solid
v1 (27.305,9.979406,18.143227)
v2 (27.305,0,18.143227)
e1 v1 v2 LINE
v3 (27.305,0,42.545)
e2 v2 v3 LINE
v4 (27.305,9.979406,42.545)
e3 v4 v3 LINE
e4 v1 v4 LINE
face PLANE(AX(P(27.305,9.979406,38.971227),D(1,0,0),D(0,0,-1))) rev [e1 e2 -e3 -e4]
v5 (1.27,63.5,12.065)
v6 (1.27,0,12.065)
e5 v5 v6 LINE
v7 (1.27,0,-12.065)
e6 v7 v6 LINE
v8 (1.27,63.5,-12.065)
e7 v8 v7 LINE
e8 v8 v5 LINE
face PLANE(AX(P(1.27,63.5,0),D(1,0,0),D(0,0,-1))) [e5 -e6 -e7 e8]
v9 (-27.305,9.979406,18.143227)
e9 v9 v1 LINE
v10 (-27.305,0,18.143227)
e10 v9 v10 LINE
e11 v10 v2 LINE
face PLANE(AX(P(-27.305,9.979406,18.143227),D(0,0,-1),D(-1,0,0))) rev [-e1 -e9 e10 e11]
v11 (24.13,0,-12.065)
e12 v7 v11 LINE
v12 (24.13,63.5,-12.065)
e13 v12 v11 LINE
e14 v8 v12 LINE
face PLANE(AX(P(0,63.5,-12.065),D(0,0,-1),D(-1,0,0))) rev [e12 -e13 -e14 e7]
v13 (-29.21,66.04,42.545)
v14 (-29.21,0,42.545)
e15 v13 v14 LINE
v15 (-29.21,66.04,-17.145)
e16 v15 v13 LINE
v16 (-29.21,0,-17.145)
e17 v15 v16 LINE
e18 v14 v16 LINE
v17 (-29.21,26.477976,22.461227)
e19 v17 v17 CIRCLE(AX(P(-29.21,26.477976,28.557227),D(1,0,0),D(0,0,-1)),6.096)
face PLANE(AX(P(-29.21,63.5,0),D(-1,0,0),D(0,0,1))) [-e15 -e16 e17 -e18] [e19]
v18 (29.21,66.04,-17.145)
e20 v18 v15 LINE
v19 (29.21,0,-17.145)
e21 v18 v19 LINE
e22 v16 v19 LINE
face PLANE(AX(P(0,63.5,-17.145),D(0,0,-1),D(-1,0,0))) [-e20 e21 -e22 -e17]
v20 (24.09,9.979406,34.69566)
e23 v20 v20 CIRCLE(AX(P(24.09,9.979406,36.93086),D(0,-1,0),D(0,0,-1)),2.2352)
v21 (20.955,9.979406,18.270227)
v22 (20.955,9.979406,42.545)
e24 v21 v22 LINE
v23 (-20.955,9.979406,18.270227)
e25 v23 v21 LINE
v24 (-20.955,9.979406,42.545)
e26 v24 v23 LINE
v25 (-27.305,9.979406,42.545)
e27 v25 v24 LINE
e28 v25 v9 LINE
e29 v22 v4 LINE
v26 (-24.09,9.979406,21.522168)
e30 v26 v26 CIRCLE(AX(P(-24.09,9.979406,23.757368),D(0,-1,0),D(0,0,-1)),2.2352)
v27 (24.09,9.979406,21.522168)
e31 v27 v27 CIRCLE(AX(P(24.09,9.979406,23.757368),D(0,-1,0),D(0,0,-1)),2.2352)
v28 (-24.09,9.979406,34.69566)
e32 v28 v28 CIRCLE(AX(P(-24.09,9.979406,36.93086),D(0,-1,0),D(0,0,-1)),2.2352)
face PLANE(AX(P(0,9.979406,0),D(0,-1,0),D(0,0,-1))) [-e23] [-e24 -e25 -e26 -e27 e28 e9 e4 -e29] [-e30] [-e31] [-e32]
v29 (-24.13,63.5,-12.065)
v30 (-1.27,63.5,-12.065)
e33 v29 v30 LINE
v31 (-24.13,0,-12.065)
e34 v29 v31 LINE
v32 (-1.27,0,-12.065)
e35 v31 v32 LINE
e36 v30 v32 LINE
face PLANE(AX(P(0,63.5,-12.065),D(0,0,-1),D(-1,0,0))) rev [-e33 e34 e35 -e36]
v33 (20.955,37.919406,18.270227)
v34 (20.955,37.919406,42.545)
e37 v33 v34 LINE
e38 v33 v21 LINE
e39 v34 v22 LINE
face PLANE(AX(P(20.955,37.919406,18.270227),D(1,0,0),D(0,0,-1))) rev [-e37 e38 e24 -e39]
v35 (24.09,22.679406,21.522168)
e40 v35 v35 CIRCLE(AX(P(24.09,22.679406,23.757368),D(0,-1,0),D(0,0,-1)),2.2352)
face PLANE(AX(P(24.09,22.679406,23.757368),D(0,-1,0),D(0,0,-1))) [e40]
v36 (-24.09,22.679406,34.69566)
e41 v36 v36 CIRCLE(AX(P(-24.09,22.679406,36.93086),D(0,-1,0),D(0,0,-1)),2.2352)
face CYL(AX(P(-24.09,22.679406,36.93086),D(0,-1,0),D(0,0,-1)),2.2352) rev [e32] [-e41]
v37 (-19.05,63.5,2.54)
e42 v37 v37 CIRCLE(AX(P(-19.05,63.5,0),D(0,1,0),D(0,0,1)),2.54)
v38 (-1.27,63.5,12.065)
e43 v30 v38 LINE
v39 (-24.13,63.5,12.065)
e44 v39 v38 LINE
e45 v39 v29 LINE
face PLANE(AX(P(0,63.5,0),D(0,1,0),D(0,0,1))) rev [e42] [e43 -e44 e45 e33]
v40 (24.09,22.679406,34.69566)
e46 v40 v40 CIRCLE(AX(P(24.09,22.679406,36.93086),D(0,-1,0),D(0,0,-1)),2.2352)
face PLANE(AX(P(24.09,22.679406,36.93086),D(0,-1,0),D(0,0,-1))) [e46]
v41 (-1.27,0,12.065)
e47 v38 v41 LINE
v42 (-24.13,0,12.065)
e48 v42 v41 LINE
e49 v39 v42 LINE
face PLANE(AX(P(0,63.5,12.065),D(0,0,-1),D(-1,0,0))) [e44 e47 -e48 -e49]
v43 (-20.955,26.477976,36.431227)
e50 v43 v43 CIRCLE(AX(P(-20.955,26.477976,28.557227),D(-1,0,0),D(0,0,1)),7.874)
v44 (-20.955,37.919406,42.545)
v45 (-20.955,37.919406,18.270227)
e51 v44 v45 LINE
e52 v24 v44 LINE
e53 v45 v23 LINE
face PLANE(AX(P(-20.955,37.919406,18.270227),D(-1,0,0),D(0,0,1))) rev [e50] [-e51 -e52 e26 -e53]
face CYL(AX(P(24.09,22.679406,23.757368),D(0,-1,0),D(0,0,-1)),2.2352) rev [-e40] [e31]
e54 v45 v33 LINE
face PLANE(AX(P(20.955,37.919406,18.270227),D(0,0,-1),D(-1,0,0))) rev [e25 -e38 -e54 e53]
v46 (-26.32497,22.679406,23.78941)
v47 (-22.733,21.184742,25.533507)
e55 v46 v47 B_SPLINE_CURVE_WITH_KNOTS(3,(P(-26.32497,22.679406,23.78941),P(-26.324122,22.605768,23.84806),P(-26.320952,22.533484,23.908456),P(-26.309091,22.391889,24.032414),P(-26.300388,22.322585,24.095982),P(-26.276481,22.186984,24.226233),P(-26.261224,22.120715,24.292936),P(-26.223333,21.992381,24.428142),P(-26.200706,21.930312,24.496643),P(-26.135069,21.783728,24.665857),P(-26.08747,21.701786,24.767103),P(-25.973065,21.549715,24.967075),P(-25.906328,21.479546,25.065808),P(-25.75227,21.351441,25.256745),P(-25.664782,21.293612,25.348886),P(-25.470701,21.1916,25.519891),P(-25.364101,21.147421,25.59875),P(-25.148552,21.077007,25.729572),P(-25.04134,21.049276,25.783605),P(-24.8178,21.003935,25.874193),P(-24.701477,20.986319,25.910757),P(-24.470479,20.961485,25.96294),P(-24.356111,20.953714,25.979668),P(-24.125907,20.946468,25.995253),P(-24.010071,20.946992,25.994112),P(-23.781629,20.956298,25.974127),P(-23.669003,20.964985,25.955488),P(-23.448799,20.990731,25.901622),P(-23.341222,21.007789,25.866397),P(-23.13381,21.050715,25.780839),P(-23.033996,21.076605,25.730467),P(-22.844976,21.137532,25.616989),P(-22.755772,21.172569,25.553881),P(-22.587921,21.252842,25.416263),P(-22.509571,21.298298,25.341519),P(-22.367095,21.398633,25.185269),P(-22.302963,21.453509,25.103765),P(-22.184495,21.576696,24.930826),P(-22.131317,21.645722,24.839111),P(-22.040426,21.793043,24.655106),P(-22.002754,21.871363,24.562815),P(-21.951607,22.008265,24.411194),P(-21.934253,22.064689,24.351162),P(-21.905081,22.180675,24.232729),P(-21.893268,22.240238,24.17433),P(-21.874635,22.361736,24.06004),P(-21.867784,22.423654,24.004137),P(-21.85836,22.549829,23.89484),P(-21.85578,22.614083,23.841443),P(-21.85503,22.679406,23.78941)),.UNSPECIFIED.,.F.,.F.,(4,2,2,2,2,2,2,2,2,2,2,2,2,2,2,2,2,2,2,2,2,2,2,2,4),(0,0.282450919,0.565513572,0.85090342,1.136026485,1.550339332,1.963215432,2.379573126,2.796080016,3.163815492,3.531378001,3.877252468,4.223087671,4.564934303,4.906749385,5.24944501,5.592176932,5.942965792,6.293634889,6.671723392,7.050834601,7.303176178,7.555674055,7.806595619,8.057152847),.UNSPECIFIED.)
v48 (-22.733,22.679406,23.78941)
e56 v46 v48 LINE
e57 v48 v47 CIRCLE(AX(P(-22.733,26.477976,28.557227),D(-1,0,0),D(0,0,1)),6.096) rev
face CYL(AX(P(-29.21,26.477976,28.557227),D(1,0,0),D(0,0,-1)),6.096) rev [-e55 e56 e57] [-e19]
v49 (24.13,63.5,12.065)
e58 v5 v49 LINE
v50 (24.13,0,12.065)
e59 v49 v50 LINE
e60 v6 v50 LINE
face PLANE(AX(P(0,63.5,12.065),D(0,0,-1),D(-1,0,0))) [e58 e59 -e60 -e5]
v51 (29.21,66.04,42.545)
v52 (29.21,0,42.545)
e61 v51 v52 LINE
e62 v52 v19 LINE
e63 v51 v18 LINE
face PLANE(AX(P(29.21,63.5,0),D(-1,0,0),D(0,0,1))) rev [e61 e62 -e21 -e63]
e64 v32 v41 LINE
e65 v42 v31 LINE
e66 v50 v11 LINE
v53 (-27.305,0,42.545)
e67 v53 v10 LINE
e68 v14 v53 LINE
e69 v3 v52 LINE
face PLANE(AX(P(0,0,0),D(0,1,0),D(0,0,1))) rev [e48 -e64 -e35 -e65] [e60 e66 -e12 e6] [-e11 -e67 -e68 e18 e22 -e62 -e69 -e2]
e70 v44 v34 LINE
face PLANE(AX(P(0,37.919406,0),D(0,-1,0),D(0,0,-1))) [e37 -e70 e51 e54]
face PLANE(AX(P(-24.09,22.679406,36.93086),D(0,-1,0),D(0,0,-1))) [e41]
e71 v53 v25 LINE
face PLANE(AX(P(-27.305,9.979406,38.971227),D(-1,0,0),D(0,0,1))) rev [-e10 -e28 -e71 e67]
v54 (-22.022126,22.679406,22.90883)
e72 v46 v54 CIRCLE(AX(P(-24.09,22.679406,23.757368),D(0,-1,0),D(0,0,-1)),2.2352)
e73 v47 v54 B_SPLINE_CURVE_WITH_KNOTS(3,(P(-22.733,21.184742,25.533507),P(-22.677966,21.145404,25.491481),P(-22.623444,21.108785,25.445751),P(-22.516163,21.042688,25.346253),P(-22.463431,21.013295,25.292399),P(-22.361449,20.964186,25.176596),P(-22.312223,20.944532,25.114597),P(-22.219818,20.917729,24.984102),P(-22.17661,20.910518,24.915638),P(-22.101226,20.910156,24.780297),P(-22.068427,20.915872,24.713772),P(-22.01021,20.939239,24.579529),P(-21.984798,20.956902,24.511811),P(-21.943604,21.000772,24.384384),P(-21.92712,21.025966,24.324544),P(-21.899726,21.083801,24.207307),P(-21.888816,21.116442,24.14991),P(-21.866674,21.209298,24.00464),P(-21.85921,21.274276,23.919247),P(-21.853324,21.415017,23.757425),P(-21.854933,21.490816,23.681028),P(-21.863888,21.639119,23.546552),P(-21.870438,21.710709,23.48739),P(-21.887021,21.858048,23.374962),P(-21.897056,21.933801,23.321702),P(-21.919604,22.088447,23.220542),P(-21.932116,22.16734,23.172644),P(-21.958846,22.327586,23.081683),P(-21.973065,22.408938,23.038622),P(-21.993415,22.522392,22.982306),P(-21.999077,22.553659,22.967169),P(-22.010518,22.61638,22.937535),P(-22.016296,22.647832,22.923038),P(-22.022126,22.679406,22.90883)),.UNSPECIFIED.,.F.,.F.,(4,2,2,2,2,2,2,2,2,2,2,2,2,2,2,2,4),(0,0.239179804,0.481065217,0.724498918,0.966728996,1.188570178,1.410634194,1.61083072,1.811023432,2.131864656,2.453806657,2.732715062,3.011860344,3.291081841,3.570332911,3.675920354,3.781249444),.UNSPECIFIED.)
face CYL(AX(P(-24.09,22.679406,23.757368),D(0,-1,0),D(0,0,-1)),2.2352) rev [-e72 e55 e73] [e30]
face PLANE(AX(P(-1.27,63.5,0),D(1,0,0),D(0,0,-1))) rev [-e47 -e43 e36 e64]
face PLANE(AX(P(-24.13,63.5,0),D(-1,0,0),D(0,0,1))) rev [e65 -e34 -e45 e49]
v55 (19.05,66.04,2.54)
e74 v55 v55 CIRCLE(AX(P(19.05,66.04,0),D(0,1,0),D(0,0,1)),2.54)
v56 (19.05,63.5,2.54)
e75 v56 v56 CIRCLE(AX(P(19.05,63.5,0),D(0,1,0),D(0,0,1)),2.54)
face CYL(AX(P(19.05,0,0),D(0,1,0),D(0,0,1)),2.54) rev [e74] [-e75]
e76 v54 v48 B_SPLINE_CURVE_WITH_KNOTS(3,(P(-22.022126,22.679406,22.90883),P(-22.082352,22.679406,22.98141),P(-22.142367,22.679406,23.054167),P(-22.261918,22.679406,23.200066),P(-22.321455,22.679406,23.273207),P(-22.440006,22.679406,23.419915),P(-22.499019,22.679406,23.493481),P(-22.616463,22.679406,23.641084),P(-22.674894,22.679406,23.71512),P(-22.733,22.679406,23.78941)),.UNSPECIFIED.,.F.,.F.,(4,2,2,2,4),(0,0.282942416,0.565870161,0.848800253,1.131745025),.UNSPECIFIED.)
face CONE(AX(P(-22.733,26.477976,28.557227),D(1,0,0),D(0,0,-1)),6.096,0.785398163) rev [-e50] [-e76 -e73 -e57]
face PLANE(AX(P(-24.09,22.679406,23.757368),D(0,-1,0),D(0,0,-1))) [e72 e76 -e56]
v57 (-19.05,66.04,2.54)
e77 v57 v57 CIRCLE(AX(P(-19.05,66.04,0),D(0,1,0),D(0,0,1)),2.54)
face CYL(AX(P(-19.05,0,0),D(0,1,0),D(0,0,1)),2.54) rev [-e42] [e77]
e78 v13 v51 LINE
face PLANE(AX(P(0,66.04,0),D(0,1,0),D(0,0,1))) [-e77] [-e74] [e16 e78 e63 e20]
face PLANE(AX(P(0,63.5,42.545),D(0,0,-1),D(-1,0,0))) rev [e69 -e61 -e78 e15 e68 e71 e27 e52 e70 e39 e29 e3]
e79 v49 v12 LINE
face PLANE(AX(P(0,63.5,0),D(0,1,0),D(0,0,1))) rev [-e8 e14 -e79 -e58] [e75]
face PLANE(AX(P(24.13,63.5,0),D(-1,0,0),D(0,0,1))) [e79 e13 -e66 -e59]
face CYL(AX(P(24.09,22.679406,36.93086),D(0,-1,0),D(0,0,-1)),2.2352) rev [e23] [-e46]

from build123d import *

# Parameters (mm, degrees)
SKETCH1_W           = 58.42
SKETCH1_H           = 34.29
SKETCH1_W_2         = 22.86
SKETCH1_H_2         = 24.13
SKETCH1_H_3         = 25.4
BOSS_EXTRUDE1_DEPTH = 63.5
SKETCH2_W           = 58.42
SKETCH2_H           = 59.69
BOSS_EXTRUDE2_DEPTH = 2.54
SKETCH3_R           = 2.54
CUT_EXTRUDE1_DEPTH  = 84.81278378
SKETCH6_W           = 54.61
SKETCH6_H           = 20.828
CUT_EXTRUDE3_DEPTH  = 9.979406
SKETCH7_R           = 2.2352
CUT_EXTRUDE4_DEPTH  = 12.7
SKETCH9_W           = 41.91
SKETCH9_H           = 20.574
CUT_EXTRUDE5_DEPTH  = 27.94
SKETCH10_R          = 6.096
CUT_EXTRUDE6_DEPTH  = 94.208829249
CUT_EXTRUDE7_DEPTH  = 92.374500249
CHAMFER1_SIZE       = 1.778


with BuildPart() as part:
    # Sketch1 → Boss-Extrude1 (new body)
    # profile 1 of 2: a face of its own
    with BuildSketch(Plane(origin=(0, 0, 0), x_dir=(1, 0, 0), z_dir=(0, 1, 0))):
        Rectangle(SKETCH1_W, SKETCH1_H)
        with Locations((-12.7, 0)):
            Rectangle(SKETCH1_W_2, SKETCH1_H_2, mode=Mode.SUBTRACT)
        with Locations((12.7, 0)):
            Rectangle(SKETCH1_W_2, SKETCH1_H_2, mode=Mode.SUBTRACT)
    # profile 2 of 2: a face of its own
    with BuildSketch(Plane(origin=(0, 0, 0), x_dir=(1, 0, 0), z_dir=(0, 1, 0))):
        with Locations((0, -29.845)):
            Rectangle(SKETCH1_W, SKETCH1_H_3)
    extrude(amount=BOSS_EXTRUDE1_DEPTH)

    # Sketch2 → Boss-Extrude2 (add)
    with BuildSketch(Plane(origin=(0, 63.5, 0), x_dir=(1, 0, 0), z_dir=(0, 1, 0))):
        with Locations((0, -12.7)):
            Rectangle(SKETCH2_W, SKETCH2_H)
    extrude(amount=BOSS_EXTRUDE2_DEPTH)

    # Sketch3 → Cut-Extrude1 (cut, through all)
    with BuildSketch(Plane(origin=(0, 66.04, 0), x_dir=(1, 0, 0), z_dir=(0, 1, 0))):
        with Locations(Location((-19.05, 0, 0), (0, 0, 270))):
            Circle(SKETCH3_R)
        with Locations(Location((19.05, 0, 0), (0, 0, 270))):
            Circle(SKETCH3_R)
    extrude(amount=-CUT_EXTRUDE1_DEPTH, mode=Mode.SUBTRACT)

    # Sketch6 → Cut-Extrude3 (cut)
    with BuildSketch(Plane.XZ):
        with Locations((0, 28.557227446)):
            Rectangle(SKETCH6_W, SKETCH6_H)
    extrude(amount=-CUT_EXTRUDE3_DEPTH, mode=Mode.SUBTRACT)

    # Sketch7 → Cut-Extrude4 (cut)
    with BuildSketch(Plane.XZ.offset(-9.979406)):
        with Locations(Location((24.09, 36.930859788, 0), (0, 0, 270))):
            Circle(SKETCH7_R)
        with Locations(Location((24.09, 23.757367658, 0), (0, 0, 270))):
            Circle(SKETCH7_R)
        with Locations(Location((-24.09, 23.757367658, 0), (0, 0, 270))):
            Circle(SKETCH7_R)
        with Locations(Location((-24.09, 36.930859788, 0), (0, 0, 270))):
            Circle(SKETCH7_R)
    extrude(amount=-CUT_EXTRUDE4_DEPTH, mode=Mode.SUBTRACT)

    # Sketch9 → Cut-Extrude5 (cut)
    with BuildSketch(Plane.XZ.offset(-9.979406)):
        with Locations((0, 28.557227446)):
            Rectangle(SKETCH9_W, SKETCH9_H)
    extrude(amount=-CUT_EXTRUDE5_DEPTH, mode=Mode.SUBTRACT)

    # Sketch10 → Cut-Extrude6 (cut, through all)
    with BuildSketch(Plane(origin=(-20.955, 0, 0), x_dir=(0, 0, -1), z_dir=(1, 0, 0))):
        with Locations((-28.557227446, 26.477976)):
            Circle(SKETCH10_R)
    extrude(amount=-CUT_EXTRUDE6_DEPTH, mode=Mode.SUBTRACT)

    # Sketch11 → Cut-Extrude7 (cut, through all)
    with BuildSketch(Plane(origin=(0, 0, 38.844227446), x_dir=(-1, 0, 0), z_dir=(0, 0, -1))):
        Polygon((-27.305, 0), (27.305, 0), (27.305, 9.979406), (25.002698669, 9.979406), (23.177301331, 9.979406), (20.955, 9.979406), (20.955, 37.919406), (-20.955, 37.919406), (-20.955, 9.979406), (-23.177301331, 9.979406), (-25.002698669, 9.979406), (-27.305, 9.979406), align=None)
    extrude(amount=-CUT_EXTRUDE7_DEPTH, mode=Mode.SUBTRACT)

    # Chamfer1
    # the kernel refuses this chamfer: 1.778 mm, written as the material it takes off along each edge
    with BuildSketch(Plane(origin=(-20.955, 26.477976, 28.557227446), x_dir=(0, 0, -1), z_dir=(0, -1, 0))) as chamfer1_piece_1:
        Polygon((6.096, -CHAMFER1_SIZE), (6.096 + CHAMFER1_SIZE, 0), (6.096, 0), align=None)
    revolve(axis=Axis((-20.955, 26.477976, 28.557227446), (1, 0, 0)), mode=Mode.SUBTRACT)


solid = part.part
